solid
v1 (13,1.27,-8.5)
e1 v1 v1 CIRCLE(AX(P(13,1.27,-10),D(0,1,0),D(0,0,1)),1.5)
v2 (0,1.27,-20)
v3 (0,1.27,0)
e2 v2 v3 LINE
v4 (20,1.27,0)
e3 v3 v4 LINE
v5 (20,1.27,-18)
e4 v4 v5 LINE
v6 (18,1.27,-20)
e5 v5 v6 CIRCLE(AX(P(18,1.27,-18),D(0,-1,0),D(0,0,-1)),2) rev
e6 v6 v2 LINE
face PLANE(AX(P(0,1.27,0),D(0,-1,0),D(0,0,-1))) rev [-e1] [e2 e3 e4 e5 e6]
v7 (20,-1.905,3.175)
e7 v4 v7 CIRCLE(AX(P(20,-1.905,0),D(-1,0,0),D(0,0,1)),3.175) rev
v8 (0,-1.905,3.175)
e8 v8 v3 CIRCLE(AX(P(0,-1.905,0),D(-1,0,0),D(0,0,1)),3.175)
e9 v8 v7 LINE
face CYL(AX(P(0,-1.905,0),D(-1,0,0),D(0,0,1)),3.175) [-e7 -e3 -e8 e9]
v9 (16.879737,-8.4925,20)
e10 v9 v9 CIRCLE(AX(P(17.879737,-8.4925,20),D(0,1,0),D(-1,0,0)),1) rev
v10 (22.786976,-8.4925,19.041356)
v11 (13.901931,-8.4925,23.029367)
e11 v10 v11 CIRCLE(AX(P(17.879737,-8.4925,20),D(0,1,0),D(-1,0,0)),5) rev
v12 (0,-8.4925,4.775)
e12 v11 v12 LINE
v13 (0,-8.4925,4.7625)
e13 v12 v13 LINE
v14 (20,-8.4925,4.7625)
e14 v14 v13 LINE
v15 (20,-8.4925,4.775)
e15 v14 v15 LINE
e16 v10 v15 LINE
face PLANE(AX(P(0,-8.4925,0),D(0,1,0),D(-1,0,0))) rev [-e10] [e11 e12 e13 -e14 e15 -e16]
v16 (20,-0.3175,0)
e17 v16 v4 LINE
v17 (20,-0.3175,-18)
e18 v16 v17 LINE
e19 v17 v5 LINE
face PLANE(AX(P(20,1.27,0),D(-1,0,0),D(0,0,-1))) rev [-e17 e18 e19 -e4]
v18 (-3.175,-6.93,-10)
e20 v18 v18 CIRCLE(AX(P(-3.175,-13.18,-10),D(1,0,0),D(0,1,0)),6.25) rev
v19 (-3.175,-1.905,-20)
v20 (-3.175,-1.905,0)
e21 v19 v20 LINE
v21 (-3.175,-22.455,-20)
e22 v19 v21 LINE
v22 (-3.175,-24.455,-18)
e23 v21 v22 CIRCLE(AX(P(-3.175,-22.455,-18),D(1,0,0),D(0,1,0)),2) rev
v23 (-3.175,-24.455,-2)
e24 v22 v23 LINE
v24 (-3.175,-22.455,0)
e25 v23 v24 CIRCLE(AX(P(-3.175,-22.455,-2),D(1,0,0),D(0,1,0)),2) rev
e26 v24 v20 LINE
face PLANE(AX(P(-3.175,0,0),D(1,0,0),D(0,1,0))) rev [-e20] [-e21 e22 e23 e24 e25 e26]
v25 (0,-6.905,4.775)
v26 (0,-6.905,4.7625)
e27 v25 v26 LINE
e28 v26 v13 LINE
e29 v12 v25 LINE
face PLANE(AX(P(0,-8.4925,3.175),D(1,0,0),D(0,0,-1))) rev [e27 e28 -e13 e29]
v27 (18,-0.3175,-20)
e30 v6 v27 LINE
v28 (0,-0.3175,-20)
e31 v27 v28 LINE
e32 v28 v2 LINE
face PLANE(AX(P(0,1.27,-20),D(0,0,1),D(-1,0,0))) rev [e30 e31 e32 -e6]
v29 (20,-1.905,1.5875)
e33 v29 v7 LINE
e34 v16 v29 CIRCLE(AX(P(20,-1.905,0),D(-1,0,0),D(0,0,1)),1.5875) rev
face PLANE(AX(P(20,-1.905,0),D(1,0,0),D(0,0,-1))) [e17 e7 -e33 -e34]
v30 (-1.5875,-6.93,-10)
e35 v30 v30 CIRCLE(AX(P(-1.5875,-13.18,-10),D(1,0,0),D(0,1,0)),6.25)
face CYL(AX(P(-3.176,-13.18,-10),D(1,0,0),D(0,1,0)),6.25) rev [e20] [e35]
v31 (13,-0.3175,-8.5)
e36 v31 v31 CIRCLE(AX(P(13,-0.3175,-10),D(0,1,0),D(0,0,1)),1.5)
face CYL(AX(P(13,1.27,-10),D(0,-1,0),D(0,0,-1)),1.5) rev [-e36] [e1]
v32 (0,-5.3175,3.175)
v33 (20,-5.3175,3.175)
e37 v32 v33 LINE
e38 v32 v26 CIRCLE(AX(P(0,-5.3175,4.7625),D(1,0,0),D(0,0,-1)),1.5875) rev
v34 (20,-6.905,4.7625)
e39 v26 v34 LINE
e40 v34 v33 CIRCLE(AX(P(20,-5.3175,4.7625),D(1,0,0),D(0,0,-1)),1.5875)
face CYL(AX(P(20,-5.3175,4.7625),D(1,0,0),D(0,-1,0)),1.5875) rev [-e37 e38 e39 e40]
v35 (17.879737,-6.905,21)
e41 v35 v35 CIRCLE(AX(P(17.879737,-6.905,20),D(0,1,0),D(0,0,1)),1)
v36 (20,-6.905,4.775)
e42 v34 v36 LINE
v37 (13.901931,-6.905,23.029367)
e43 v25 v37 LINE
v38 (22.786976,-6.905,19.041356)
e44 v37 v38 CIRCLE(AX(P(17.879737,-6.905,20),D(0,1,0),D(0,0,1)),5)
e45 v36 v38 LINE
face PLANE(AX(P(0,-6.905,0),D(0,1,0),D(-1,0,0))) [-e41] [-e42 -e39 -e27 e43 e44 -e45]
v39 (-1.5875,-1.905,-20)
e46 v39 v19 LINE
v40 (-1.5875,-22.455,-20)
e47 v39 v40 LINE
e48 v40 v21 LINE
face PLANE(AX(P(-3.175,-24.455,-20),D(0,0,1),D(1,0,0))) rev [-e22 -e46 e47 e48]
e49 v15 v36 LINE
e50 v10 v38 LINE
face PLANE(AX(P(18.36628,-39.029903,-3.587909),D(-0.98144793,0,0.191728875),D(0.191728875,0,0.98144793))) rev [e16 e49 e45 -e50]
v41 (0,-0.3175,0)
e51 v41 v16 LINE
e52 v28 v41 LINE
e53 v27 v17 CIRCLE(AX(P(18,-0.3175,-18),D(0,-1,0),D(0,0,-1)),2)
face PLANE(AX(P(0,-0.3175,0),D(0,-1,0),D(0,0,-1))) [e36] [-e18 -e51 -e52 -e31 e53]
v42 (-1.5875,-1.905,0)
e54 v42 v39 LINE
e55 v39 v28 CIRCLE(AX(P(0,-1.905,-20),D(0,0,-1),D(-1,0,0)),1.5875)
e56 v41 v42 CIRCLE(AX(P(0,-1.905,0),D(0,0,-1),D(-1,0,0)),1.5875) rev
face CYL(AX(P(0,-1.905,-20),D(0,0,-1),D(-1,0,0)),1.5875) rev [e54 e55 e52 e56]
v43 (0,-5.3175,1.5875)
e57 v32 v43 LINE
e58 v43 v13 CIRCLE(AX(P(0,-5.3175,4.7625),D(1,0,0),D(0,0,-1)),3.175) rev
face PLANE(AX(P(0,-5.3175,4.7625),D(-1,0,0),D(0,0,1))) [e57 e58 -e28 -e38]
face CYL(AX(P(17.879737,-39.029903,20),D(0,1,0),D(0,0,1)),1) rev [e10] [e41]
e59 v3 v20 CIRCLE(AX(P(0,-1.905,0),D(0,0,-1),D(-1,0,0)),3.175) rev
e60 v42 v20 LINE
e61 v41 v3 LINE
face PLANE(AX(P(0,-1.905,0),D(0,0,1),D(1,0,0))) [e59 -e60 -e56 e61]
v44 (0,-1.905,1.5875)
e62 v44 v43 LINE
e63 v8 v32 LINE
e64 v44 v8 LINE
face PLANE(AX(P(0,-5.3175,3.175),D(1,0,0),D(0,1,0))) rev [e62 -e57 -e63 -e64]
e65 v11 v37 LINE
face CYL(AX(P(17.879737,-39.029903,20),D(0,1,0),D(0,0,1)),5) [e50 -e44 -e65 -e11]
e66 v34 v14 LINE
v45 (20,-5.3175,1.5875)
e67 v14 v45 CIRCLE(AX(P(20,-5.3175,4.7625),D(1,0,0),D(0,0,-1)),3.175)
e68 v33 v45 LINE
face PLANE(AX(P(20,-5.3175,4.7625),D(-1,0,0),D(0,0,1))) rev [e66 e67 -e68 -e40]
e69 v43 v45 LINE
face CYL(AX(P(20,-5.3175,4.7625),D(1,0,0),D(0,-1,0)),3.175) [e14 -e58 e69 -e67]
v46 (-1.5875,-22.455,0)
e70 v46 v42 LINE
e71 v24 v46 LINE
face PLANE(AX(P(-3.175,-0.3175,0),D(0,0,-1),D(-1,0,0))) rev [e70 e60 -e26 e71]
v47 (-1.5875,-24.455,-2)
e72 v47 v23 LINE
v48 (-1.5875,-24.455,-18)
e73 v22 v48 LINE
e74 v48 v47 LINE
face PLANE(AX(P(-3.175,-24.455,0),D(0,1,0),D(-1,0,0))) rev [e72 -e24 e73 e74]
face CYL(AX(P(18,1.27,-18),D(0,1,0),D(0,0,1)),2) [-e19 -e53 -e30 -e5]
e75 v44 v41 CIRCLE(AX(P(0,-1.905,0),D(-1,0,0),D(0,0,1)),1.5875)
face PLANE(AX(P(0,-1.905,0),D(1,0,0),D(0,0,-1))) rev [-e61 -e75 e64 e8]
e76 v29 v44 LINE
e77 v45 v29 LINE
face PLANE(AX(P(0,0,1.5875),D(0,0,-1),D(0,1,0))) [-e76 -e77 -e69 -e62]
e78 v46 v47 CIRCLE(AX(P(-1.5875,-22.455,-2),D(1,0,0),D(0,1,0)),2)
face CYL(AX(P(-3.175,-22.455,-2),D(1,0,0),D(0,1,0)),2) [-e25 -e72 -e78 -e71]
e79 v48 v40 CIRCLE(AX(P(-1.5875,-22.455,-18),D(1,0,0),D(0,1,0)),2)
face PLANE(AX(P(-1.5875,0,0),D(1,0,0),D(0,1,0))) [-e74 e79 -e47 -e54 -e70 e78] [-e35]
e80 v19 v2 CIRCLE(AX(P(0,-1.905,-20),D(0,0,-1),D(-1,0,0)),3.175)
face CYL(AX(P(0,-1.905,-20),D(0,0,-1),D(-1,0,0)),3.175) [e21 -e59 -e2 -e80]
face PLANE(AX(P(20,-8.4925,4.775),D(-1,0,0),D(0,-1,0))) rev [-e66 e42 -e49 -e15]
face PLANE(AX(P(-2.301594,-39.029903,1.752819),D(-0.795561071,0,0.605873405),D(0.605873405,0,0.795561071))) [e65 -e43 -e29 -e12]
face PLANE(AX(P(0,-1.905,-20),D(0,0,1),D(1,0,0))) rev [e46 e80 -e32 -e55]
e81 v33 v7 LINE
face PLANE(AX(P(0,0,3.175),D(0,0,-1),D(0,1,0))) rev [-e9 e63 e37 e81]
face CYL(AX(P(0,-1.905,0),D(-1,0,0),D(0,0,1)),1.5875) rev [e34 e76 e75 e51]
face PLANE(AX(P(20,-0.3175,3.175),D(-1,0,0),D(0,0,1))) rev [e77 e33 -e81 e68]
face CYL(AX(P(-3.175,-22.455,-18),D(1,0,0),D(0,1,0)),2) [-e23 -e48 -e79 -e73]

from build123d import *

# Parameters (mm, degrees)
SKETCH2_W                = 20
SKETCH2_H                = 20
BOSS_EXTRUDE1_DEPTH      = 1.27
HOLE1_OUTLINE_R          = 1.5
HOLE1_DEPTH              = 1.27
CONVERT_SOLID3_START     = -0.3175
CONVERT_SOLID3_OUTLINE_W = 20
CONVERT_SOLID3_OUTLINE_H = 20
CONVERT_SOLID3_OUTLINE_R = 1.5
CONVERT_SOLID3_DEPTH     = 0.3175
EDGE_FLANGE1_DEPTH       = 20
CUT_EXTRUDE1_REACH       = 40.263
SKETCH25_R               = 6.25
EDGE_FLANGE3_DEPTH       = 20
EDGE_FLANGE4_DEPTH       = 20
SKETCH31_R               = 1
BOSS_EXTRUDE2_DEPTH      = 1.5875
FILLET1_R                = 2


# Read off the part's stored shape, not the designer's step: Hole1, Convert-Solid3
# Sheet-metal steps are written as plain solids
with BuildPart() as part:
    # Sketch2 → Boss-Extrude1 (new body)
    with BuildSketch(Plane(origin=(0, 0, 0), x_dir=(1, 0, 0), z_dir=(0, 1, 0))):
        with Locations((10, 10)):
            Rectangle(SKETCH2_W, SKETCH2_H)
    extrude(amount=BOSS_EXTRUDE1_DEPTH)

    # Hole1 outline → Hole1 (cut)
    with BuildSketch(Plane(origin=(0, 0, 0), x_dir=(1, 0, 0), z_dir=(0, 1, 0))):
        with Locations((13, 10)):
            Circle(HOLE1_OUTLINE_R)
    extrude(amount=HOLE1_DEPTH, mode=Mode.SUBTRACT)

    # Convert-Solid3 outline → Convert-Solid3 (add)
    with BuildSketch(Plane(origin=(0, 0, 0), x_dir=(1, 0, 0), z_dir=(0, 1, 0)).offset(CONVERT_SOLID3_START)):
        with Locations((10, 10)):
            Rectangle(CONVERT_SOLID3_OUTLINE_W, CONVERT_SOLID3_OUTLINE_H)
        with Locations((13, 10)):
            Circle(CONVERT_SOLID3_OUTLINE_R, mode=Mode.SUBTRACT)
    extrude(amount=CONVERT_SOLID3_DEPTH)

    # Edge-Flange1 section (across the edge) → Edge-Flange1 (add)
    with BuildSketch(Plane(origin=(-1.5875, -0.3175, 0), x_dir=(1, 0, 0), z_dir=(0, 0, -1))):
        with BuildLine():
            Line((-1.5875, 1.5875), (-1.5875, 24.1375))
            Line((-1.5875, 24.1375), (0, 24.1375))
            Line((0, 24.1375), (0, 1.5875))
            ThreePointArc((0, 1.5875), (0.464967985, 0.464967985), (1.5875, 0))
            Line((1.5875, 0), (1.5875, -1.5875))
            ThreePointArc((1.5875, -1.5875), (-0.65756403, -0.65756403), (-1.5875, 1.5875))
        make_face()
    extrude(amount=EDGE_FLANGE1_DEPTH)

    # Sketch25 → Cut-Extrude1 (cut, up to next)
    with BuildSketch(Plane(origin=(-1.5875, 0, 0), x_dir=(0, 0, -1), z_dir=(1, 0, 0)), mode=Mode.PRIVATE) as cut_extrude1_sk1:
        with Locations(Location((10, -13.18, 0), (0, 0, 90))):
            Circle(SKETCH25_R)
    cut_extrude1_tool1 = extrude(cut_extrude1_sk1.sketch, amount=-CUT_EXTRUDE1_REACH, mode=Mode.PRIVATE) & part.part
    add(cut_extrude1_tool1.solids().sort_by_distance((-1.5875, -13.18, -10))[0], mode=Mode.SUBTRACT)

    # Edge-Flange3 section (across the edge) → Edge-Flange3 (add)
    with BuildSketch(Plane(origin=(20, -0.3175, 1.5875), x_dir=(0, 0, -1), z_dir=(-1, 0, 0))):
        with BuildLine():
            Line((-1.5875, 1.5875), (-1.5875, 5))
            Line((-1.5875, 5), (0, 5))
            Line((0, 5), (0, 1.5875))
            ThreePointArc((0, 1.5875), (0.464967985, 0.464967985), (1.5875, 0))
            Line((1.5875, 0), (1.5875, -1.5875))
            ThreePointArc((1.5875, -1.5875), (-0.65756403, -0.65756403), (-1.5875, 1.5875))
        make_face()
    extrude(amount=EDGE_FLANGE3_DEPTH)

    # Edge-Flange4 section (across the edge) → Edge-Flange4 (add)
    with BuildSketch(Plane(origin=(0, -6.905, 3.175), x_dir=(0, 1, 0), z_dir=(1, 0, 0))):
        with BuildLine():
            Line((-1.5875, 1.5875), (-1.5875, 1.6))
            Line((-1.5875, 1.6), (0, 1.6))
            Line((0, 1.6), (0, 1.5875))
            ThreePointArc((0, 1.5875), (0.464967985, 0.464967985), (1.5875, 0))
            Line((1.5875, 0), (1.5875, -1.5875))
            ThreePointArc((1.5875, -1.5875), (-0.65756403, -0.65756403), (-1.5875, 1.5875))
        make_face()
    extrude(amount=EDGE_FLANGE4_DEPTH)

    # Sketch31 → Boss-Extrude2 (add)
    with BuildSketch(Plane(origin=(0, -6.905, 0), x_dir=(1, 0, 0), z_dir=(0, 1, 0))):
        with BuildLine():
            Line((20, -4.775), (0, -4.775))
            Line((0, -4.775), (13.901931499, -23.029367025))
            ThreePointArc((13.901931499, -23.029367025), (19.927179344, -24.561576399), (22.7869765, -19.041355625))
            Line((22.7869765, -19.041355625), (20, -4.775))
        make_face()
        with Locations(Location((17.879736852, -20, 0), (0, 0, 270))):
            Circle(SKETCH31_R, mode=Mode.SUBTRACT)
    extrude(amount=-BOSS_EXTRUDE2_DEPTH)

    # Fillet1
    fillet1_edges = [part.edges().sort_by_distance(p)[0] for p in [
        (20, 0.47625, -20),
        (-2.38125, -24.455, 0),
        (-2.38125, -24.455, -20),
    ]]
    fillet(fillet1_edges, radius=FILLET1_R)


solid = part.part
